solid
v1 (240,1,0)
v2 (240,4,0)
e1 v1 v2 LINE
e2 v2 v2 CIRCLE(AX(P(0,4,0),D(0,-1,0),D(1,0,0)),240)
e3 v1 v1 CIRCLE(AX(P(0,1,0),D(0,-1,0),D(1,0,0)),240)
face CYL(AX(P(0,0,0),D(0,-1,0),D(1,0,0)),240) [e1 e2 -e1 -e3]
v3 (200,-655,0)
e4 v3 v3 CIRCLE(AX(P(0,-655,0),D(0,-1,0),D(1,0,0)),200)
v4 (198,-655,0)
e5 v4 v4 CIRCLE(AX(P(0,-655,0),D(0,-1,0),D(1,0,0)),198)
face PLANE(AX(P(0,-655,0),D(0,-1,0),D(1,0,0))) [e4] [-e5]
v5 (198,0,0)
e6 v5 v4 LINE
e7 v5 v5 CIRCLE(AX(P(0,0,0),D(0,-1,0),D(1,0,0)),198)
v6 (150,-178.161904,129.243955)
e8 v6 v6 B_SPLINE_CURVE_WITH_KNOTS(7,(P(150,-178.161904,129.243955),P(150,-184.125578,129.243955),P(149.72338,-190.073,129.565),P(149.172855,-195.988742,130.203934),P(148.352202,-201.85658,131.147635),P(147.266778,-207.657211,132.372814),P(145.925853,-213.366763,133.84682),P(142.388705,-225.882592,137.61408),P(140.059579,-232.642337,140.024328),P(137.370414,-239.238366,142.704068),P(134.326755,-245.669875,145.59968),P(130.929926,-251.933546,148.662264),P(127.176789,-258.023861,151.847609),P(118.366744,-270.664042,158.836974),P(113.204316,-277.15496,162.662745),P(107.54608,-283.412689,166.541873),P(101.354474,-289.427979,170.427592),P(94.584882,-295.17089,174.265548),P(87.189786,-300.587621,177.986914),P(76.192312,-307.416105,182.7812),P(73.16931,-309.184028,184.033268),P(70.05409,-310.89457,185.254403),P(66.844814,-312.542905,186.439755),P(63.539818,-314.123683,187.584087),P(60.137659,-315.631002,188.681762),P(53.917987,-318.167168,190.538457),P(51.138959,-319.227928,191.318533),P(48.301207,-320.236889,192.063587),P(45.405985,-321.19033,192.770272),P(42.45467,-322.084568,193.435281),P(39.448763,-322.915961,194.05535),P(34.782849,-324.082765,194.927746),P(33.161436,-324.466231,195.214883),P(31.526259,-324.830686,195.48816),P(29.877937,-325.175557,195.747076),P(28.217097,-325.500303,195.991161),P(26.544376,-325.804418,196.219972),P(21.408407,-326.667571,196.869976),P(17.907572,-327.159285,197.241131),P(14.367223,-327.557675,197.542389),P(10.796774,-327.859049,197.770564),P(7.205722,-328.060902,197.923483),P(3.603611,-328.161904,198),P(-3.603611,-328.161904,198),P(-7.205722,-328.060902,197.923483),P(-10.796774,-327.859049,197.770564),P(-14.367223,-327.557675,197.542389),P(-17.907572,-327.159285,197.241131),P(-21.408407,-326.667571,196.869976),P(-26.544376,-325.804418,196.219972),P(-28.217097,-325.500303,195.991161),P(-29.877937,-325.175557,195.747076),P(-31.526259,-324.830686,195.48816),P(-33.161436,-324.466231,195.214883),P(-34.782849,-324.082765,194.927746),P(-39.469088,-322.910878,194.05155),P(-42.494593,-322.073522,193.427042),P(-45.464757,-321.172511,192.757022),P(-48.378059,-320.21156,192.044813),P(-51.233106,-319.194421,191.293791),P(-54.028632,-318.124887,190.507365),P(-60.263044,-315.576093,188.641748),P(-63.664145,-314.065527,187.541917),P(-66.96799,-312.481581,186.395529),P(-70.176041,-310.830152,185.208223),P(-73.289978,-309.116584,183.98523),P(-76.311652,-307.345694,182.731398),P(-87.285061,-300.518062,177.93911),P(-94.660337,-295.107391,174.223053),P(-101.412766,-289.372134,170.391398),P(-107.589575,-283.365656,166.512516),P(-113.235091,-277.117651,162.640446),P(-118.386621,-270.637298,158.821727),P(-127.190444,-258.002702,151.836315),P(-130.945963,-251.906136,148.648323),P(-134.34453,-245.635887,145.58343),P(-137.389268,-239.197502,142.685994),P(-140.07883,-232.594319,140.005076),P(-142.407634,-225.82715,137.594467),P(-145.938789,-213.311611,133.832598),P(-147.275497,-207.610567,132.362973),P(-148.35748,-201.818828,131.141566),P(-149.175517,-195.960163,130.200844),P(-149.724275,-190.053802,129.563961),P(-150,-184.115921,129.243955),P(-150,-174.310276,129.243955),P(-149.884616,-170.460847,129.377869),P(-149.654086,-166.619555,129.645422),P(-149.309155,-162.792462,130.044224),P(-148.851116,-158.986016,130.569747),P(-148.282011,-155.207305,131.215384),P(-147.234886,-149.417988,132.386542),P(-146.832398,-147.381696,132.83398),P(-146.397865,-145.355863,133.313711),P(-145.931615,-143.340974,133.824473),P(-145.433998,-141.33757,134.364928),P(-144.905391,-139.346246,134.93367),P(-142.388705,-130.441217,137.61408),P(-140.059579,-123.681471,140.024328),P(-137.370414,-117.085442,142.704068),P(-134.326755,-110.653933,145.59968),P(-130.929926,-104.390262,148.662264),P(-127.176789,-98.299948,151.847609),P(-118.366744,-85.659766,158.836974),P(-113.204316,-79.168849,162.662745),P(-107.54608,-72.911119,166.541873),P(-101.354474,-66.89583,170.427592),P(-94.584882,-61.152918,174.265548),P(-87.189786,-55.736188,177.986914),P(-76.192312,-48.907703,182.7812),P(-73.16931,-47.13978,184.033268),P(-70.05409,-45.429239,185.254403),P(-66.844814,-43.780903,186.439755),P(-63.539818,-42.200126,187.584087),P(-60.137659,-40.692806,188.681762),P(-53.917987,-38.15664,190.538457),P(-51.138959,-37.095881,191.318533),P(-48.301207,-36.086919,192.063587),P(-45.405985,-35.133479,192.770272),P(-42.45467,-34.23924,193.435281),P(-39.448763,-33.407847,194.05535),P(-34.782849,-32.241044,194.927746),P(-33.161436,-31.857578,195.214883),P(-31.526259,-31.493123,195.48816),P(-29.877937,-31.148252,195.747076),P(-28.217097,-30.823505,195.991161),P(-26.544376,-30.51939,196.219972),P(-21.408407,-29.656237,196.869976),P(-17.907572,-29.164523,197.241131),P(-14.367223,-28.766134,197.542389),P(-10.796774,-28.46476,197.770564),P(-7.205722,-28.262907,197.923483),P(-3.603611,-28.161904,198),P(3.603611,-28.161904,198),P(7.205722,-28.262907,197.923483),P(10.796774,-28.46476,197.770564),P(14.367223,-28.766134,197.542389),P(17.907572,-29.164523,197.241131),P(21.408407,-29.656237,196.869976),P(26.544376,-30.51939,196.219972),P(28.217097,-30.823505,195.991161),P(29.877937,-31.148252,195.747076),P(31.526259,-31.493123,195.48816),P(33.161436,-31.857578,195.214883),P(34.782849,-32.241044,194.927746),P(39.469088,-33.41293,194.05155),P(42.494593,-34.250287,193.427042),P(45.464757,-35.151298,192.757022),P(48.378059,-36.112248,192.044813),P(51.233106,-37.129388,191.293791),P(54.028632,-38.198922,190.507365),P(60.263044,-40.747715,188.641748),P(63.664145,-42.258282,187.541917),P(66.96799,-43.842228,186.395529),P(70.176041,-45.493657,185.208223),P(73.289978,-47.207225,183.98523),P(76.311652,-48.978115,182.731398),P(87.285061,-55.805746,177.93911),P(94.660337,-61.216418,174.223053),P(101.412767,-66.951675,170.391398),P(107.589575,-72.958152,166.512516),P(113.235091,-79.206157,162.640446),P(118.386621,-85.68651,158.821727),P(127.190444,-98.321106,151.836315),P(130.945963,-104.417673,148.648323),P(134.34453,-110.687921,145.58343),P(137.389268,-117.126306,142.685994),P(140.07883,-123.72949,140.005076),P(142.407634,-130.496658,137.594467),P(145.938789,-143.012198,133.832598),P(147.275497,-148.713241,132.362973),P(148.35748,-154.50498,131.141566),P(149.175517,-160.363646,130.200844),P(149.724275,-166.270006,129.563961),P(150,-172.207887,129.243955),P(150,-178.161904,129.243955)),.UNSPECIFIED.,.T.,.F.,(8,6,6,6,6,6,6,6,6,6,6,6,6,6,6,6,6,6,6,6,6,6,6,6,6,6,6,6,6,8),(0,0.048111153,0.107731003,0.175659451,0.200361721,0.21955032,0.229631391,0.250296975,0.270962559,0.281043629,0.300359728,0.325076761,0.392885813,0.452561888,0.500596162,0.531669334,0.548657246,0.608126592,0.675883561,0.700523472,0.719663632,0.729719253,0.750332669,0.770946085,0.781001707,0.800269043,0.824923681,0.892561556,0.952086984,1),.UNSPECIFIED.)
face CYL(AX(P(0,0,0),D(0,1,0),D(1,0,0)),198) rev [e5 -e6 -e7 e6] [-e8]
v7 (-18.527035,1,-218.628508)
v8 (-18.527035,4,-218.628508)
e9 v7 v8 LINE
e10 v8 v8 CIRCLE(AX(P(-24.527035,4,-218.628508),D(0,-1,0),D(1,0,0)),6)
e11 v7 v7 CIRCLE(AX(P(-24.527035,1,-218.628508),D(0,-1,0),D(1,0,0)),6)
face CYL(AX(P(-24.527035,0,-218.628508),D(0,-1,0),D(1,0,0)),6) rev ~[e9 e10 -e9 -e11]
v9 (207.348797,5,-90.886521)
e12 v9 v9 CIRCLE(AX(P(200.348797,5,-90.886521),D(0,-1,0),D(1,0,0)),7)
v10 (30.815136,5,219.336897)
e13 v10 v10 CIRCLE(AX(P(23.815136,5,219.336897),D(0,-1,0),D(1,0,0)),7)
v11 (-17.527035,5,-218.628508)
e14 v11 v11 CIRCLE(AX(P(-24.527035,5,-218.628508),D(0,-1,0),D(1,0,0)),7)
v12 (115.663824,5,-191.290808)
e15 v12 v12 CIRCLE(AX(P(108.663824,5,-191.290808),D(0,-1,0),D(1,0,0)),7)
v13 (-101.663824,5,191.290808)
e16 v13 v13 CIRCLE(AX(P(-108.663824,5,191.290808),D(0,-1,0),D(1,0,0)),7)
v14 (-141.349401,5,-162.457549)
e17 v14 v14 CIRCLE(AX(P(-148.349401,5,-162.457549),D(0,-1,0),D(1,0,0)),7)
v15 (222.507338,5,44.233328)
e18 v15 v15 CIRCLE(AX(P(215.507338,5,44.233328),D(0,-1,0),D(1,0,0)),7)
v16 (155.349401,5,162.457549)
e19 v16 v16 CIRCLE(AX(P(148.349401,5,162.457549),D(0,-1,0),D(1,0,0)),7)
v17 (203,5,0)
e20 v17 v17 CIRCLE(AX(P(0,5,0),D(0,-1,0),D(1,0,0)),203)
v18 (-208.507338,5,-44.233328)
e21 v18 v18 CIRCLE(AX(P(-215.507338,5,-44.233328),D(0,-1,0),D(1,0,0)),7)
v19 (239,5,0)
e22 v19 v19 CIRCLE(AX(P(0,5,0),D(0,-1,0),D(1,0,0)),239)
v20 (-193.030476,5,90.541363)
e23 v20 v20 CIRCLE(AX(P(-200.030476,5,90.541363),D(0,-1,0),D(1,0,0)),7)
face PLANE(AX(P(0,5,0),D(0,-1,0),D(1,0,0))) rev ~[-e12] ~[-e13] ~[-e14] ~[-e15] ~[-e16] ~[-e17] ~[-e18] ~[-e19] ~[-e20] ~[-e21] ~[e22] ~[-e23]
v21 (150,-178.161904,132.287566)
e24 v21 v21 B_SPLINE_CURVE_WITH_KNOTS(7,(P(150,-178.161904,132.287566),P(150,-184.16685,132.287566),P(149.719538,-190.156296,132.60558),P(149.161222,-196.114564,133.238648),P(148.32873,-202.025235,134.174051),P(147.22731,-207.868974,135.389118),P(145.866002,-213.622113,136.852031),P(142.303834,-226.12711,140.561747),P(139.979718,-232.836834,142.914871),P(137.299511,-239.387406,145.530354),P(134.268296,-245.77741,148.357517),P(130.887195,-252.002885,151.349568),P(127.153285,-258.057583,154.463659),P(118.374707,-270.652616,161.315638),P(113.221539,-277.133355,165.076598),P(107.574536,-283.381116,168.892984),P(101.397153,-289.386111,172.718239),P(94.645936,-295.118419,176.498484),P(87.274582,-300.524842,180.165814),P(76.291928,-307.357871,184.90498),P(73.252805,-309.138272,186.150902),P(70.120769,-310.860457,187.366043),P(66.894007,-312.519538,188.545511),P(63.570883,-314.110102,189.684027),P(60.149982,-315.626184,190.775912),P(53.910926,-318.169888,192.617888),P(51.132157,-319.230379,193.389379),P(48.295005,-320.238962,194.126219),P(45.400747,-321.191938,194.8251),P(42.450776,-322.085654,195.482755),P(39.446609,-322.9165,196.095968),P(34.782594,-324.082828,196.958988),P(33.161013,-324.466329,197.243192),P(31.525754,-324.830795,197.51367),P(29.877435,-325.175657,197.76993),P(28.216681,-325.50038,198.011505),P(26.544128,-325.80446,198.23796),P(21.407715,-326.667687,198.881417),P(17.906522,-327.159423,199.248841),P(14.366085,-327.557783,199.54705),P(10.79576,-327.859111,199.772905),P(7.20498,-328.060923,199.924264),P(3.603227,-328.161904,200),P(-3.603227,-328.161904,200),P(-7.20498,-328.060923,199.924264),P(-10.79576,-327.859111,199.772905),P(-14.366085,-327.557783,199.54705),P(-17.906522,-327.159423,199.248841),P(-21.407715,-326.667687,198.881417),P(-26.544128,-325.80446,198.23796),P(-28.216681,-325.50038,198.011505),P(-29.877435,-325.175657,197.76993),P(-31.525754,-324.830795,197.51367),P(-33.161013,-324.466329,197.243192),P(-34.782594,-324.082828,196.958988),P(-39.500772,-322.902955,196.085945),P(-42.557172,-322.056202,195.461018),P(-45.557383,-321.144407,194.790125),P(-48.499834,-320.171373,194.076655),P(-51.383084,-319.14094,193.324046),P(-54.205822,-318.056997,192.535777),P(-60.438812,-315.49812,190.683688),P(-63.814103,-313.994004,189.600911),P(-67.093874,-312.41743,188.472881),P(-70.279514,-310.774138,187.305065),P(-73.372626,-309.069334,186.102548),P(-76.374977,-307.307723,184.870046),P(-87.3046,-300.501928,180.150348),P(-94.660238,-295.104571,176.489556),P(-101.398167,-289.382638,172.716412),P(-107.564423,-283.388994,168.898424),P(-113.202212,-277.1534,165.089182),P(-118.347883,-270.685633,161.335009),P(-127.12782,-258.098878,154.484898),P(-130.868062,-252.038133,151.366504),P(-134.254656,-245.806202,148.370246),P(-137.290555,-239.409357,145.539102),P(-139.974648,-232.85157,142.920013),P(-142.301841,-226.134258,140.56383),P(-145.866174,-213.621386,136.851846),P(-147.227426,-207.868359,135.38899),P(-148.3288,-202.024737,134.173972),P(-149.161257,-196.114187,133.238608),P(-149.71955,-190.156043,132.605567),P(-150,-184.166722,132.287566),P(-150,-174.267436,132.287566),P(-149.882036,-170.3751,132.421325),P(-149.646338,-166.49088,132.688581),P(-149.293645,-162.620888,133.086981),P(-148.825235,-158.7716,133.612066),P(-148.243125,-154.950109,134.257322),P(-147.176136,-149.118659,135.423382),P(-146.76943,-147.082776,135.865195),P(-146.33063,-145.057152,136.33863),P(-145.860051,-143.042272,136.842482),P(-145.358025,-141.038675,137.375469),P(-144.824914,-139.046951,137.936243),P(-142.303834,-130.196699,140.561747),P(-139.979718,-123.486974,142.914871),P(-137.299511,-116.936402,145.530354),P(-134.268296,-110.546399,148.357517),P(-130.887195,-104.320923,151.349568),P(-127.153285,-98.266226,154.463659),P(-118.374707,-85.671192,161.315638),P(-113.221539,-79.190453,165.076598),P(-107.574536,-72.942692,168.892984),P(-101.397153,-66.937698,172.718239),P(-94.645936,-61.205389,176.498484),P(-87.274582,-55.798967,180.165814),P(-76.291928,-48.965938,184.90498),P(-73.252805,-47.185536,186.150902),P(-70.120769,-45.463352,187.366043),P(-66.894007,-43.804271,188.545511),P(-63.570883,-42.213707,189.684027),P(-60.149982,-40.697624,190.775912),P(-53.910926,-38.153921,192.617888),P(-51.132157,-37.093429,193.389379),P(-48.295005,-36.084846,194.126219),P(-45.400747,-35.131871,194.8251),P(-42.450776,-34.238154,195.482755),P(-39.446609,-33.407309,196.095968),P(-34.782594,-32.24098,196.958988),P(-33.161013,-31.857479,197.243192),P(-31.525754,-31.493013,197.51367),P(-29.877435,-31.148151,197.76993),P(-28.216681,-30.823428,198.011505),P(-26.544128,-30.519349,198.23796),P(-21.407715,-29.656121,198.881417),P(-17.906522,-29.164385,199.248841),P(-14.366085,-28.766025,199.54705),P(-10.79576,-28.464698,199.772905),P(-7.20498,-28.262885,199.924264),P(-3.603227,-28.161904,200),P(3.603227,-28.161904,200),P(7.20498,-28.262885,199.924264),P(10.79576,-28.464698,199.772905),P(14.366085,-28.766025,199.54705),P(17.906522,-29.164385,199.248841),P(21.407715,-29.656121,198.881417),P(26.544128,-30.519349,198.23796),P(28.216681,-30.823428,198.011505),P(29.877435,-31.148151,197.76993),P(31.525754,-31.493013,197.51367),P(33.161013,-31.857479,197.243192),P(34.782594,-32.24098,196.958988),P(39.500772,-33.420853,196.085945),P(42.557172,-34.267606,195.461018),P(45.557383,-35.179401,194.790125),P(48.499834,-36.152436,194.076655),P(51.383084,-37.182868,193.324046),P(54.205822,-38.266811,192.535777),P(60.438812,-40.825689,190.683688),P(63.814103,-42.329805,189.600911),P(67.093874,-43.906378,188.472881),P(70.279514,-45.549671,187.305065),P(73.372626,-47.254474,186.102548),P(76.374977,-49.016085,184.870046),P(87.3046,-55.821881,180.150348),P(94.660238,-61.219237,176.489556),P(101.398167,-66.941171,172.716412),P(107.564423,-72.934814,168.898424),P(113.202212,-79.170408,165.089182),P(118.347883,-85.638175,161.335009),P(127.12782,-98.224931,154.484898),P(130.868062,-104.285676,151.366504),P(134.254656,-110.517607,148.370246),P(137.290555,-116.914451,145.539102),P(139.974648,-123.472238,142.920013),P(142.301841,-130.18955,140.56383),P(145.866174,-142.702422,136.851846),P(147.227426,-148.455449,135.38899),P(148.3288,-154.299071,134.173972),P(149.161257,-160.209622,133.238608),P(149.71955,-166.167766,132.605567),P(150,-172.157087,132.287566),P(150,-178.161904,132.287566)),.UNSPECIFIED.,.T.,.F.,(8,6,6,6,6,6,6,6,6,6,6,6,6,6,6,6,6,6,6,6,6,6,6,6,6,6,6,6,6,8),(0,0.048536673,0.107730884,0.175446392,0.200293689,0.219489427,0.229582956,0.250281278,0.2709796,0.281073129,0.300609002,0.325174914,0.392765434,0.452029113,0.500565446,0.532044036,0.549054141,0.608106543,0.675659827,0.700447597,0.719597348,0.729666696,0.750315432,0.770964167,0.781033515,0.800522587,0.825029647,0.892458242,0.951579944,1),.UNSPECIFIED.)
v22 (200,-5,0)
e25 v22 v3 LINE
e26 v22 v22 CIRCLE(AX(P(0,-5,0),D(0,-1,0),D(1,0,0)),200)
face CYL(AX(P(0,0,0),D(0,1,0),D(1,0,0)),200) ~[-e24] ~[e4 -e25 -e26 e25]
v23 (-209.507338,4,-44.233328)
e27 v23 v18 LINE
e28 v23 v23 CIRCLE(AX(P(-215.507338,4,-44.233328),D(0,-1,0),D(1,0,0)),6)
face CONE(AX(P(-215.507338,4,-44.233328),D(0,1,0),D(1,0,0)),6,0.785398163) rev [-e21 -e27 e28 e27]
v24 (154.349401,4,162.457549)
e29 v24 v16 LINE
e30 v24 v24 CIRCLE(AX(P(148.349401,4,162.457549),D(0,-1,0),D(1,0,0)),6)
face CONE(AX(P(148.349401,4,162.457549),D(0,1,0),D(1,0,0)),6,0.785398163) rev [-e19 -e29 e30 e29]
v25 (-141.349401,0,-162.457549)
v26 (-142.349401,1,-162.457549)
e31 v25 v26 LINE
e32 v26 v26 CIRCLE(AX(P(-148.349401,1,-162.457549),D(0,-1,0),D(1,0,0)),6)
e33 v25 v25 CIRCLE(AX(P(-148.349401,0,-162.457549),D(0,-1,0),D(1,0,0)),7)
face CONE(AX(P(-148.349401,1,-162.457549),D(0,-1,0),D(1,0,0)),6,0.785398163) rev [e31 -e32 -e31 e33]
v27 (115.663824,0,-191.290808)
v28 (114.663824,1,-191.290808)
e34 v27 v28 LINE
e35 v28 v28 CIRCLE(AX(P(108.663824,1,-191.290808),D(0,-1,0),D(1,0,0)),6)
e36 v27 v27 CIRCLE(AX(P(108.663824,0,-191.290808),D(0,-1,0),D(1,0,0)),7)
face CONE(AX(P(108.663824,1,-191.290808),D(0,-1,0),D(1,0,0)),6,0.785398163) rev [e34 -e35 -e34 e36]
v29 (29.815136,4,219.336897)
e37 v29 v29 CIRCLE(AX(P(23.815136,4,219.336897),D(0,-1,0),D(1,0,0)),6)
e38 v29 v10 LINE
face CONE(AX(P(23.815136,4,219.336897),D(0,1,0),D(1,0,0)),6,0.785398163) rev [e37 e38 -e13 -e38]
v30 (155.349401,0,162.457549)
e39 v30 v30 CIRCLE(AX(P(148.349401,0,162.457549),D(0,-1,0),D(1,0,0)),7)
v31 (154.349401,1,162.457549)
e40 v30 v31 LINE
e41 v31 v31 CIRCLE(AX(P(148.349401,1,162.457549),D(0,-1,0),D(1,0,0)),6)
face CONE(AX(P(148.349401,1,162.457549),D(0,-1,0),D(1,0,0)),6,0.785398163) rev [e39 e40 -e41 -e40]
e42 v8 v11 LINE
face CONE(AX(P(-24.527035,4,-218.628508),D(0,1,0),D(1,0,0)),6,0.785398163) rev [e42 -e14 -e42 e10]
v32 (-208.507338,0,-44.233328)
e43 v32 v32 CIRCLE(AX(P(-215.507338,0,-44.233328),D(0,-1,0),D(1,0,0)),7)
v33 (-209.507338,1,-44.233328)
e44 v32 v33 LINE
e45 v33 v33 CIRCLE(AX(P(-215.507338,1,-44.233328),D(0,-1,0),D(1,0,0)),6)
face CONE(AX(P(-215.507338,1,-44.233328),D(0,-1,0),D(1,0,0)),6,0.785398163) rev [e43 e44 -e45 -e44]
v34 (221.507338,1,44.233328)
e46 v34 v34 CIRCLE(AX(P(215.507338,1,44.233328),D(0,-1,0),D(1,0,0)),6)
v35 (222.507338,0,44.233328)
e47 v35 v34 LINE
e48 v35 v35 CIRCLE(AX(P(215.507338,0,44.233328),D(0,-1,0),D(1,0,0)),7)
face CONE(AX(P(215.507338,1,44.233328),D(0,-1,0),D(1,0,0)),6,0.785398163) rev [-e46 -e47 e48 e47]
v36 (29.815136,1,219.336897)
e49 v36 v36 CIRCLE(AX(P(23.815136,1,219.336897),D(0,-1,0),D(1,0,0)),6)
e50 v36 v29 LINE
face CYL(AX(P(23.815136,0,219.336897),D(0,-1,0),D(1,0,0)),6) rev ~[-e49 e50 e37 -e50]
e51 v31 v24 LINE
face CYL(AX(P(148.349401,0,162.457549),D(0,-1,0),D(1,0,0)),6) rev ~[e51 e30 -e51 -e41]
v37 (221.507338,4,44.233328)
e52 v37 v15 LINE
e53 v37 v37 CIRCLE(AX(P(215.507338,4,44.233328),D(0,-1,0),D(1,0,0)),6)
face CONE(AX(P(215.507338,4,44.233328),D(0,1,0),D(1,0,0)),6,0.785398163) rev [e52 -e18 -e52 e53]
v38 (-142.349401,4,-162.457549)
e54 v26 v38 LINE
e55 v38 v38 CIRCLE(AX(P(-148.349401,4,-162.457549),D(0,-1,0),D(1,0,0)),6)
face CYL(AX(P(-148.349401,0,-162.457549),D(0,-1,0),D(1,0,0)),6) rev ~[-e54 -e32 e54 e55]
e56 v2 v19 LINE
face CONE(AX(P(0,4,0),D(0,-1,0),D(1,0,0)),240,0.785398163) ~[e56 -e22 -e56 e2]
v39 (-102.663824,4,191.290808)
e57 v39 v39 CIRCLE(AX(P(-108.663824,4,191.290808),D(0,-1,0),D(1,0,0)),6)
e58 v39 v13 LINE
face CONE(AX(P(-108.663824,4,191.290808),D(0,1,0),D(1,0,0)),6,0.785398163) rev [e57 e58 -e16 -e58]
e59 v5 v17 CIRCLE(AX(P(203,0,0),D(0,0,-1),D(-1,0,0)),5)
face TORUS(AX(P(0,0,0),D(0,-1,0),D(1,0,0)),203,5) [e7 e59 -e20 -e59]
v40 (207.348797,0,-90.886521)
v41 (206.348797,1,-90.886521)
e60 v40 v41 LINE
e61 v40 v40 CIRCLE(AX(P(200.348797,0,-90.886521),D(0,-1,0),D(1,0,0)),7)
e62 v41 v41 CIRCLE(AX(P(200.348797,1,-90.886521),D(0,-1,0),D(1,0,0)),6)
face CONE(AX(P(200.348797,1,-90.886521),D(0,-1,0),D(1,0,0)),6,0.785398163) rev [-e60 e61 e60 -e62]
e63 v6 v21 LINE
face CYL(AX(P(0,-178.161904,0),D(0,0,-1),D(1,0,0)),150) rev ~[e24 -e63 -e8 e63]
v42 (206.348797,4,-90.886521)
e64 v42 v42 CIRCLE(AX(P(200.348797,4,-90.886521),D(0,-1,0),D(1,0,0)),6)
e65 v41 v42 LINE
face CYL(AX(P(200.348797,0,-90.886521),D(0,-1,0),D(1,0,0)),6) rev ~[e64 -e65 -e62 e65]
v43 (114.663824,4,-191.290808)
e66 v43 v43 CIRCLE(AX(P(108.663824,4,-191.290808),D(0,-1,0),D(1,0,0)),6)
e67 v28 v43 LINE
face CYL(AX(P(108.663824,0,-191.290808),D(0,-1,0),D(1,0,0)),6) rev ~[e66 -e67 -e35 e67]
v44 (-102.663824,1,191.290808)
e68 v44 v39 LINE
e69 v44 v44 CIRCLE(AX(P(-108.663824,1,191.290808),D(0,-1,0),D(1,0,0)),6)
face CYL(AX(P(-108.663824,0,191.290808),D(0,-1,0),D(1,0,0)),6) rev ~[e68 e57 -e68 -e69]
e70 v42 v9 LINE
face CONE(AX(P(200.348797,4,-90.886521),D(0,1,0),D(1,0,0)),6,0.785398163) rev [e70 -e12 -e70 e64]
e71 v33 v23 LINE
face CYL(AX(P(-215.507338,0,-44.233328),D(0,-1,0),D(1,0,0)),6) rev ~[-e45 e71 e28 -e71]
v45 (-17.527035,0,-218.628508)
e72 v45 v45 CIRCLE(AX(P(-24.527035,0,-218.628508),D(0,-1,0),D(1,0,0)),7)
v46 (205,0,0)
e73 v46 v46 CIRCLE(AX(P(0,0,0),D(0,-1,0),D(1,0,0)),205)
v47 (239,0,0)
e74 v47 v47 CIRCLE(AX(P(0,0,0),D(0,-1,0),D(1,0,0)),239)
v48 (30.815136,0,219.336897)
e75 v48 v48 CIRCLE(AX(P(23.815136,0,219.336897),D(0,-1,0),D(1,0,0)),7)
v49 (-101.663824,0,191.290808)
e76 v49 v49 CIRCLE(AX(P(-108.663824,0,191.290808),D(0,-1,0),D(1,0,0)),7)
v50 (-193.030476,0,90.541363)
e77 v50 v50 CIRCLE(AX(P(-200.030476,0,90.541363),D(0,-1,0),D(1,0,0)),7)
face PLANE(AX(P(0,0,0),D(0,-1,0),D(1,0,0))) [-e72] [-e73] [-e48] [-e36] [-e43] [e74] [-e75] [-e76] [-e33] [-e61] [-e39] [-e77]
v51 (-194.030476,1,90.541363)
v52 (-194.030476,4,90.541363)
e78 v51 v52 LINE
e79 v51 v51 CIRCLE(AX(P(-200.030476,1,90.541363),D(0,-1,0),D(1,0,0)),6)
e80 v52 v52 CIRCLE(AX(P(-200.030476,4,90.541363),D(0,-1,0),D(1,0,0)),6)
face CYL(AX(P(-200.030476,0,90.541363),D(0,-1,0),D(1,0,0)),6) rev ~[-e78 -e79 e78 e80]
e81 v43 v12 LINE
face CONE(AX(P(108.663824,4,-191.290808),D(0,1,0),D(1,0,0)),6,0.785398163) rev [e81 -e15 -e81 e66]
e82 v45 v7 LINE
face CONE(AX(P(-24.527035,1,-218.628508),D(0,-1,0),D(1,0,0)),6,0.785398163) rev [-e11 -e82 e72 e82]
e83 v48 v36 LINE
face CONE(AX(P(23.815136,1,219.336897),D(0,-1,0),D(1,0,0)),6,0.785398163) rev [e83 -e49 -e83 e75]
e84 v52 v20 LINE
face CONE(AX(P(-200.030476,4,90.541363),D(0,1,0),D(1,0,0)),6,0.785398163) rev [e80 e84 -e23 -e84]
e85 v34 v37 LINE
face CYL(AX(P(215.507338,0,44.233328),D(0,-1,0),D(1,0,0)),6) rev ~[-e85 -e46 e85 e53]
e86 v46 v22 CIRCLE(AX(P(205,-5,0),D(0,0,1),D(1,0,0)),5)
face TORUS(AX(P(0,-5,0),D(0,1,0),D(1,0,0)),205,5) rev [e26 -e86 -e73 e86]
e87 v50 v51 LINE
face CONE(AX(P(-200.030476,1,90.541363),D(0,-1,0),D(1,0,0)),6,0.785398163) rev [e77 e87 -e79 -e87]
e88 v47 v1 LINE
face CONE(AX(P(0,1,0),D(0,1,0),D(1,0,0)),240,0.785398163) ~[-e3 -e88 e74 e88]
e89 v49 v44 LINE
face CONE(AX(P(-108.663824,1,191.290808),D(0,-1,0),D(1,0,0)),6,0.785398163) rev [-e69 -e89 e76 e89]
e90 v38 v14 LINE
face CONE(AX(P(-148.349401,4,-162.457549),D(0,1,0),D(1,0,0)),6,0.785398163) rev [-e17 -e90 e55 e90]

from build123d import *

# Parameters (mm, degrees)
F0_R     = 200
F0_R_2   = 198
F1_DEPTH = 655
F0_R_3   = 240
F0_R_4   = 6
F2_DEPTH = 5
F4_R     = 5
F5_SIZE  = 1
F6_SIZE  = 1
F8_D     = 300
F8_DEPTH = 240.001


# Not quite as in the source:
# - a fillet or chamfer that OpenCascade refuses, or shapes differently, is made with other operations: its cross-section is extruded or revolved along the edge and cut away or added
# - a feature names something its author has since deleted; it is built from what else it names


with BuildPart() as f1:
    # F0 (on Front) → F1 (new body)
    with BuildSketch(Plane.XZ):
        Circle(F0_R)
        Circle(F0_R_2, mode=Mode.SUBTRACT)
    extrude(amount=F1_DEPTH)

    # F0 (on Front) → F2 (join)
    with BuildSketch(Plane.XZ):
        Circle(F0_R_3)
        with Locations((-148.3494010818, -162.4575489125)):
            Circle(F0_R_4, mode=Mode.SUBTRACT)
        with Locations((-24.5270352061, -218.6285080771)):
            Circle(F0_R_4, mode=Mode.SUBTRACT)
        with Locations((-215.5073379549, -44.2333277925)):
            Circle(F0_R_4, mode=Mode.SUBTRACT)
        with Locations((108.663824475, -191.2908080658)):
            Circle(F0_R_4, mode=Mode.SUBTRACT)
        with Locations((200.3487965542, -90.8865211088)):
            Circle(F0_R_4, mode=Mode.SUBTRACT)
        with Locations((-200.0304758549, 90.5413627625)):
            Circle(F0_R_4, mode=Mode.SUBTRACT)
        with Locations((-108.663824475, 191.2908080658)):
            Circle(F0_R_4, mode=Mode.SUBTRACT)
        Circle(F0_R, mode=Mode.SUBTRACT)
        with Locations((215.5073379549, 44.2333277925)):
            Circle(F0_R_4, mode=Mode.SUBTRACT)
        with Locations((23.8151364028, 219.3368971348)):
            Circle(F0_R_4, mode=Mode.SUBTRACT)
        with Locations((148.3494010818, 162.4575489125)):
            Circle(F0_R_4, mode=Mode.SUBTRACT)
        Circle(F0_R)
        Circle(F0_R_2, mode=Mode.SUBTRACT)
    extrude(amount=-F2_DEPTH)

    # F3: fillet of radius 5 on 1 edges, made by hand

    # F3_s1 → F3_t2 (revolve, cut)
    with BuildSketch(Plane.XY):
        with BuildLine():
            ThreePointArc((198, 0), (199.4644660941, 3.5355339059), (203, 5))
            Line((203, 5), (198, 5))
            Line((198, 5), (198, 0))
        make_face()
    revolve(axis=Axis((0, 5, 0), (0, -1, 0)), mode=Mode.SUBTRACT)

    # F4
    f4_edges = [f1.edges().sort_by_distance(p)[0] for p in [
        (-200, 0, 0),
    ]]
    fillet(f4_edges, radius=F4_R)

    # F5
    f5_edges = [f1.edges().sort_by_distance(p)[0] for p in [
        (-205, 0, 0),
        (-240, 0, 0),
        (-154.349401, 0, -162.457549),
        (-30.527035, 0, -218.628508),
        (-221.507338, 0, -44.233328),
        (102.663824, 0, -191.290808),
        (194.348797, 0, -90.886521),
        (-206.030476, 0, 90.541363),
        (-114.663824, 0, 191.290808),
        (209.507338, 0, 44.233328),
        (17.815136, 0, 219.336897),
        (142.349401, 0, 162.457549),
    ]]
    chamfer(f5_edges, length=F5_SIZE)

    # F6
    f6_edges = [f1.edges().sort_by_distance(p)[0] for p in [
        (-240, 5, 0),
        (-154.349401, 5, -162.457549),
        (-30.527035, 5, -218.628508),
        (-221.507338, 5, -44.233328),
        (102.663824, 5, -191.290808),
        (-203, 5, 0),
        (194.348797, 5, -90.886521),
        (-206.030476, 5, 90.541363),
        (-114.663824, 5, 191.290808),
        (209.507338, 5, 44.233328),
        (17.815136, 5, 219.336897),
        (142.349401, 5, 162.457549),
    ]]
    chamfer(f6_edges, length=F6_SIZE)

    # F8 (through all, one way)
    with BuildSketch(Plane(origin=(0, 0, 0), x_dir=(1, 0, 0), z_dir=(0, 0, -1))):
        with Locations((0, 178.1619042158)):
            Circle(F8_D / 2)
    extrude(amount=-F8_DEPTH, mode=Mode.SUBTRACT)


solid = f1.part
